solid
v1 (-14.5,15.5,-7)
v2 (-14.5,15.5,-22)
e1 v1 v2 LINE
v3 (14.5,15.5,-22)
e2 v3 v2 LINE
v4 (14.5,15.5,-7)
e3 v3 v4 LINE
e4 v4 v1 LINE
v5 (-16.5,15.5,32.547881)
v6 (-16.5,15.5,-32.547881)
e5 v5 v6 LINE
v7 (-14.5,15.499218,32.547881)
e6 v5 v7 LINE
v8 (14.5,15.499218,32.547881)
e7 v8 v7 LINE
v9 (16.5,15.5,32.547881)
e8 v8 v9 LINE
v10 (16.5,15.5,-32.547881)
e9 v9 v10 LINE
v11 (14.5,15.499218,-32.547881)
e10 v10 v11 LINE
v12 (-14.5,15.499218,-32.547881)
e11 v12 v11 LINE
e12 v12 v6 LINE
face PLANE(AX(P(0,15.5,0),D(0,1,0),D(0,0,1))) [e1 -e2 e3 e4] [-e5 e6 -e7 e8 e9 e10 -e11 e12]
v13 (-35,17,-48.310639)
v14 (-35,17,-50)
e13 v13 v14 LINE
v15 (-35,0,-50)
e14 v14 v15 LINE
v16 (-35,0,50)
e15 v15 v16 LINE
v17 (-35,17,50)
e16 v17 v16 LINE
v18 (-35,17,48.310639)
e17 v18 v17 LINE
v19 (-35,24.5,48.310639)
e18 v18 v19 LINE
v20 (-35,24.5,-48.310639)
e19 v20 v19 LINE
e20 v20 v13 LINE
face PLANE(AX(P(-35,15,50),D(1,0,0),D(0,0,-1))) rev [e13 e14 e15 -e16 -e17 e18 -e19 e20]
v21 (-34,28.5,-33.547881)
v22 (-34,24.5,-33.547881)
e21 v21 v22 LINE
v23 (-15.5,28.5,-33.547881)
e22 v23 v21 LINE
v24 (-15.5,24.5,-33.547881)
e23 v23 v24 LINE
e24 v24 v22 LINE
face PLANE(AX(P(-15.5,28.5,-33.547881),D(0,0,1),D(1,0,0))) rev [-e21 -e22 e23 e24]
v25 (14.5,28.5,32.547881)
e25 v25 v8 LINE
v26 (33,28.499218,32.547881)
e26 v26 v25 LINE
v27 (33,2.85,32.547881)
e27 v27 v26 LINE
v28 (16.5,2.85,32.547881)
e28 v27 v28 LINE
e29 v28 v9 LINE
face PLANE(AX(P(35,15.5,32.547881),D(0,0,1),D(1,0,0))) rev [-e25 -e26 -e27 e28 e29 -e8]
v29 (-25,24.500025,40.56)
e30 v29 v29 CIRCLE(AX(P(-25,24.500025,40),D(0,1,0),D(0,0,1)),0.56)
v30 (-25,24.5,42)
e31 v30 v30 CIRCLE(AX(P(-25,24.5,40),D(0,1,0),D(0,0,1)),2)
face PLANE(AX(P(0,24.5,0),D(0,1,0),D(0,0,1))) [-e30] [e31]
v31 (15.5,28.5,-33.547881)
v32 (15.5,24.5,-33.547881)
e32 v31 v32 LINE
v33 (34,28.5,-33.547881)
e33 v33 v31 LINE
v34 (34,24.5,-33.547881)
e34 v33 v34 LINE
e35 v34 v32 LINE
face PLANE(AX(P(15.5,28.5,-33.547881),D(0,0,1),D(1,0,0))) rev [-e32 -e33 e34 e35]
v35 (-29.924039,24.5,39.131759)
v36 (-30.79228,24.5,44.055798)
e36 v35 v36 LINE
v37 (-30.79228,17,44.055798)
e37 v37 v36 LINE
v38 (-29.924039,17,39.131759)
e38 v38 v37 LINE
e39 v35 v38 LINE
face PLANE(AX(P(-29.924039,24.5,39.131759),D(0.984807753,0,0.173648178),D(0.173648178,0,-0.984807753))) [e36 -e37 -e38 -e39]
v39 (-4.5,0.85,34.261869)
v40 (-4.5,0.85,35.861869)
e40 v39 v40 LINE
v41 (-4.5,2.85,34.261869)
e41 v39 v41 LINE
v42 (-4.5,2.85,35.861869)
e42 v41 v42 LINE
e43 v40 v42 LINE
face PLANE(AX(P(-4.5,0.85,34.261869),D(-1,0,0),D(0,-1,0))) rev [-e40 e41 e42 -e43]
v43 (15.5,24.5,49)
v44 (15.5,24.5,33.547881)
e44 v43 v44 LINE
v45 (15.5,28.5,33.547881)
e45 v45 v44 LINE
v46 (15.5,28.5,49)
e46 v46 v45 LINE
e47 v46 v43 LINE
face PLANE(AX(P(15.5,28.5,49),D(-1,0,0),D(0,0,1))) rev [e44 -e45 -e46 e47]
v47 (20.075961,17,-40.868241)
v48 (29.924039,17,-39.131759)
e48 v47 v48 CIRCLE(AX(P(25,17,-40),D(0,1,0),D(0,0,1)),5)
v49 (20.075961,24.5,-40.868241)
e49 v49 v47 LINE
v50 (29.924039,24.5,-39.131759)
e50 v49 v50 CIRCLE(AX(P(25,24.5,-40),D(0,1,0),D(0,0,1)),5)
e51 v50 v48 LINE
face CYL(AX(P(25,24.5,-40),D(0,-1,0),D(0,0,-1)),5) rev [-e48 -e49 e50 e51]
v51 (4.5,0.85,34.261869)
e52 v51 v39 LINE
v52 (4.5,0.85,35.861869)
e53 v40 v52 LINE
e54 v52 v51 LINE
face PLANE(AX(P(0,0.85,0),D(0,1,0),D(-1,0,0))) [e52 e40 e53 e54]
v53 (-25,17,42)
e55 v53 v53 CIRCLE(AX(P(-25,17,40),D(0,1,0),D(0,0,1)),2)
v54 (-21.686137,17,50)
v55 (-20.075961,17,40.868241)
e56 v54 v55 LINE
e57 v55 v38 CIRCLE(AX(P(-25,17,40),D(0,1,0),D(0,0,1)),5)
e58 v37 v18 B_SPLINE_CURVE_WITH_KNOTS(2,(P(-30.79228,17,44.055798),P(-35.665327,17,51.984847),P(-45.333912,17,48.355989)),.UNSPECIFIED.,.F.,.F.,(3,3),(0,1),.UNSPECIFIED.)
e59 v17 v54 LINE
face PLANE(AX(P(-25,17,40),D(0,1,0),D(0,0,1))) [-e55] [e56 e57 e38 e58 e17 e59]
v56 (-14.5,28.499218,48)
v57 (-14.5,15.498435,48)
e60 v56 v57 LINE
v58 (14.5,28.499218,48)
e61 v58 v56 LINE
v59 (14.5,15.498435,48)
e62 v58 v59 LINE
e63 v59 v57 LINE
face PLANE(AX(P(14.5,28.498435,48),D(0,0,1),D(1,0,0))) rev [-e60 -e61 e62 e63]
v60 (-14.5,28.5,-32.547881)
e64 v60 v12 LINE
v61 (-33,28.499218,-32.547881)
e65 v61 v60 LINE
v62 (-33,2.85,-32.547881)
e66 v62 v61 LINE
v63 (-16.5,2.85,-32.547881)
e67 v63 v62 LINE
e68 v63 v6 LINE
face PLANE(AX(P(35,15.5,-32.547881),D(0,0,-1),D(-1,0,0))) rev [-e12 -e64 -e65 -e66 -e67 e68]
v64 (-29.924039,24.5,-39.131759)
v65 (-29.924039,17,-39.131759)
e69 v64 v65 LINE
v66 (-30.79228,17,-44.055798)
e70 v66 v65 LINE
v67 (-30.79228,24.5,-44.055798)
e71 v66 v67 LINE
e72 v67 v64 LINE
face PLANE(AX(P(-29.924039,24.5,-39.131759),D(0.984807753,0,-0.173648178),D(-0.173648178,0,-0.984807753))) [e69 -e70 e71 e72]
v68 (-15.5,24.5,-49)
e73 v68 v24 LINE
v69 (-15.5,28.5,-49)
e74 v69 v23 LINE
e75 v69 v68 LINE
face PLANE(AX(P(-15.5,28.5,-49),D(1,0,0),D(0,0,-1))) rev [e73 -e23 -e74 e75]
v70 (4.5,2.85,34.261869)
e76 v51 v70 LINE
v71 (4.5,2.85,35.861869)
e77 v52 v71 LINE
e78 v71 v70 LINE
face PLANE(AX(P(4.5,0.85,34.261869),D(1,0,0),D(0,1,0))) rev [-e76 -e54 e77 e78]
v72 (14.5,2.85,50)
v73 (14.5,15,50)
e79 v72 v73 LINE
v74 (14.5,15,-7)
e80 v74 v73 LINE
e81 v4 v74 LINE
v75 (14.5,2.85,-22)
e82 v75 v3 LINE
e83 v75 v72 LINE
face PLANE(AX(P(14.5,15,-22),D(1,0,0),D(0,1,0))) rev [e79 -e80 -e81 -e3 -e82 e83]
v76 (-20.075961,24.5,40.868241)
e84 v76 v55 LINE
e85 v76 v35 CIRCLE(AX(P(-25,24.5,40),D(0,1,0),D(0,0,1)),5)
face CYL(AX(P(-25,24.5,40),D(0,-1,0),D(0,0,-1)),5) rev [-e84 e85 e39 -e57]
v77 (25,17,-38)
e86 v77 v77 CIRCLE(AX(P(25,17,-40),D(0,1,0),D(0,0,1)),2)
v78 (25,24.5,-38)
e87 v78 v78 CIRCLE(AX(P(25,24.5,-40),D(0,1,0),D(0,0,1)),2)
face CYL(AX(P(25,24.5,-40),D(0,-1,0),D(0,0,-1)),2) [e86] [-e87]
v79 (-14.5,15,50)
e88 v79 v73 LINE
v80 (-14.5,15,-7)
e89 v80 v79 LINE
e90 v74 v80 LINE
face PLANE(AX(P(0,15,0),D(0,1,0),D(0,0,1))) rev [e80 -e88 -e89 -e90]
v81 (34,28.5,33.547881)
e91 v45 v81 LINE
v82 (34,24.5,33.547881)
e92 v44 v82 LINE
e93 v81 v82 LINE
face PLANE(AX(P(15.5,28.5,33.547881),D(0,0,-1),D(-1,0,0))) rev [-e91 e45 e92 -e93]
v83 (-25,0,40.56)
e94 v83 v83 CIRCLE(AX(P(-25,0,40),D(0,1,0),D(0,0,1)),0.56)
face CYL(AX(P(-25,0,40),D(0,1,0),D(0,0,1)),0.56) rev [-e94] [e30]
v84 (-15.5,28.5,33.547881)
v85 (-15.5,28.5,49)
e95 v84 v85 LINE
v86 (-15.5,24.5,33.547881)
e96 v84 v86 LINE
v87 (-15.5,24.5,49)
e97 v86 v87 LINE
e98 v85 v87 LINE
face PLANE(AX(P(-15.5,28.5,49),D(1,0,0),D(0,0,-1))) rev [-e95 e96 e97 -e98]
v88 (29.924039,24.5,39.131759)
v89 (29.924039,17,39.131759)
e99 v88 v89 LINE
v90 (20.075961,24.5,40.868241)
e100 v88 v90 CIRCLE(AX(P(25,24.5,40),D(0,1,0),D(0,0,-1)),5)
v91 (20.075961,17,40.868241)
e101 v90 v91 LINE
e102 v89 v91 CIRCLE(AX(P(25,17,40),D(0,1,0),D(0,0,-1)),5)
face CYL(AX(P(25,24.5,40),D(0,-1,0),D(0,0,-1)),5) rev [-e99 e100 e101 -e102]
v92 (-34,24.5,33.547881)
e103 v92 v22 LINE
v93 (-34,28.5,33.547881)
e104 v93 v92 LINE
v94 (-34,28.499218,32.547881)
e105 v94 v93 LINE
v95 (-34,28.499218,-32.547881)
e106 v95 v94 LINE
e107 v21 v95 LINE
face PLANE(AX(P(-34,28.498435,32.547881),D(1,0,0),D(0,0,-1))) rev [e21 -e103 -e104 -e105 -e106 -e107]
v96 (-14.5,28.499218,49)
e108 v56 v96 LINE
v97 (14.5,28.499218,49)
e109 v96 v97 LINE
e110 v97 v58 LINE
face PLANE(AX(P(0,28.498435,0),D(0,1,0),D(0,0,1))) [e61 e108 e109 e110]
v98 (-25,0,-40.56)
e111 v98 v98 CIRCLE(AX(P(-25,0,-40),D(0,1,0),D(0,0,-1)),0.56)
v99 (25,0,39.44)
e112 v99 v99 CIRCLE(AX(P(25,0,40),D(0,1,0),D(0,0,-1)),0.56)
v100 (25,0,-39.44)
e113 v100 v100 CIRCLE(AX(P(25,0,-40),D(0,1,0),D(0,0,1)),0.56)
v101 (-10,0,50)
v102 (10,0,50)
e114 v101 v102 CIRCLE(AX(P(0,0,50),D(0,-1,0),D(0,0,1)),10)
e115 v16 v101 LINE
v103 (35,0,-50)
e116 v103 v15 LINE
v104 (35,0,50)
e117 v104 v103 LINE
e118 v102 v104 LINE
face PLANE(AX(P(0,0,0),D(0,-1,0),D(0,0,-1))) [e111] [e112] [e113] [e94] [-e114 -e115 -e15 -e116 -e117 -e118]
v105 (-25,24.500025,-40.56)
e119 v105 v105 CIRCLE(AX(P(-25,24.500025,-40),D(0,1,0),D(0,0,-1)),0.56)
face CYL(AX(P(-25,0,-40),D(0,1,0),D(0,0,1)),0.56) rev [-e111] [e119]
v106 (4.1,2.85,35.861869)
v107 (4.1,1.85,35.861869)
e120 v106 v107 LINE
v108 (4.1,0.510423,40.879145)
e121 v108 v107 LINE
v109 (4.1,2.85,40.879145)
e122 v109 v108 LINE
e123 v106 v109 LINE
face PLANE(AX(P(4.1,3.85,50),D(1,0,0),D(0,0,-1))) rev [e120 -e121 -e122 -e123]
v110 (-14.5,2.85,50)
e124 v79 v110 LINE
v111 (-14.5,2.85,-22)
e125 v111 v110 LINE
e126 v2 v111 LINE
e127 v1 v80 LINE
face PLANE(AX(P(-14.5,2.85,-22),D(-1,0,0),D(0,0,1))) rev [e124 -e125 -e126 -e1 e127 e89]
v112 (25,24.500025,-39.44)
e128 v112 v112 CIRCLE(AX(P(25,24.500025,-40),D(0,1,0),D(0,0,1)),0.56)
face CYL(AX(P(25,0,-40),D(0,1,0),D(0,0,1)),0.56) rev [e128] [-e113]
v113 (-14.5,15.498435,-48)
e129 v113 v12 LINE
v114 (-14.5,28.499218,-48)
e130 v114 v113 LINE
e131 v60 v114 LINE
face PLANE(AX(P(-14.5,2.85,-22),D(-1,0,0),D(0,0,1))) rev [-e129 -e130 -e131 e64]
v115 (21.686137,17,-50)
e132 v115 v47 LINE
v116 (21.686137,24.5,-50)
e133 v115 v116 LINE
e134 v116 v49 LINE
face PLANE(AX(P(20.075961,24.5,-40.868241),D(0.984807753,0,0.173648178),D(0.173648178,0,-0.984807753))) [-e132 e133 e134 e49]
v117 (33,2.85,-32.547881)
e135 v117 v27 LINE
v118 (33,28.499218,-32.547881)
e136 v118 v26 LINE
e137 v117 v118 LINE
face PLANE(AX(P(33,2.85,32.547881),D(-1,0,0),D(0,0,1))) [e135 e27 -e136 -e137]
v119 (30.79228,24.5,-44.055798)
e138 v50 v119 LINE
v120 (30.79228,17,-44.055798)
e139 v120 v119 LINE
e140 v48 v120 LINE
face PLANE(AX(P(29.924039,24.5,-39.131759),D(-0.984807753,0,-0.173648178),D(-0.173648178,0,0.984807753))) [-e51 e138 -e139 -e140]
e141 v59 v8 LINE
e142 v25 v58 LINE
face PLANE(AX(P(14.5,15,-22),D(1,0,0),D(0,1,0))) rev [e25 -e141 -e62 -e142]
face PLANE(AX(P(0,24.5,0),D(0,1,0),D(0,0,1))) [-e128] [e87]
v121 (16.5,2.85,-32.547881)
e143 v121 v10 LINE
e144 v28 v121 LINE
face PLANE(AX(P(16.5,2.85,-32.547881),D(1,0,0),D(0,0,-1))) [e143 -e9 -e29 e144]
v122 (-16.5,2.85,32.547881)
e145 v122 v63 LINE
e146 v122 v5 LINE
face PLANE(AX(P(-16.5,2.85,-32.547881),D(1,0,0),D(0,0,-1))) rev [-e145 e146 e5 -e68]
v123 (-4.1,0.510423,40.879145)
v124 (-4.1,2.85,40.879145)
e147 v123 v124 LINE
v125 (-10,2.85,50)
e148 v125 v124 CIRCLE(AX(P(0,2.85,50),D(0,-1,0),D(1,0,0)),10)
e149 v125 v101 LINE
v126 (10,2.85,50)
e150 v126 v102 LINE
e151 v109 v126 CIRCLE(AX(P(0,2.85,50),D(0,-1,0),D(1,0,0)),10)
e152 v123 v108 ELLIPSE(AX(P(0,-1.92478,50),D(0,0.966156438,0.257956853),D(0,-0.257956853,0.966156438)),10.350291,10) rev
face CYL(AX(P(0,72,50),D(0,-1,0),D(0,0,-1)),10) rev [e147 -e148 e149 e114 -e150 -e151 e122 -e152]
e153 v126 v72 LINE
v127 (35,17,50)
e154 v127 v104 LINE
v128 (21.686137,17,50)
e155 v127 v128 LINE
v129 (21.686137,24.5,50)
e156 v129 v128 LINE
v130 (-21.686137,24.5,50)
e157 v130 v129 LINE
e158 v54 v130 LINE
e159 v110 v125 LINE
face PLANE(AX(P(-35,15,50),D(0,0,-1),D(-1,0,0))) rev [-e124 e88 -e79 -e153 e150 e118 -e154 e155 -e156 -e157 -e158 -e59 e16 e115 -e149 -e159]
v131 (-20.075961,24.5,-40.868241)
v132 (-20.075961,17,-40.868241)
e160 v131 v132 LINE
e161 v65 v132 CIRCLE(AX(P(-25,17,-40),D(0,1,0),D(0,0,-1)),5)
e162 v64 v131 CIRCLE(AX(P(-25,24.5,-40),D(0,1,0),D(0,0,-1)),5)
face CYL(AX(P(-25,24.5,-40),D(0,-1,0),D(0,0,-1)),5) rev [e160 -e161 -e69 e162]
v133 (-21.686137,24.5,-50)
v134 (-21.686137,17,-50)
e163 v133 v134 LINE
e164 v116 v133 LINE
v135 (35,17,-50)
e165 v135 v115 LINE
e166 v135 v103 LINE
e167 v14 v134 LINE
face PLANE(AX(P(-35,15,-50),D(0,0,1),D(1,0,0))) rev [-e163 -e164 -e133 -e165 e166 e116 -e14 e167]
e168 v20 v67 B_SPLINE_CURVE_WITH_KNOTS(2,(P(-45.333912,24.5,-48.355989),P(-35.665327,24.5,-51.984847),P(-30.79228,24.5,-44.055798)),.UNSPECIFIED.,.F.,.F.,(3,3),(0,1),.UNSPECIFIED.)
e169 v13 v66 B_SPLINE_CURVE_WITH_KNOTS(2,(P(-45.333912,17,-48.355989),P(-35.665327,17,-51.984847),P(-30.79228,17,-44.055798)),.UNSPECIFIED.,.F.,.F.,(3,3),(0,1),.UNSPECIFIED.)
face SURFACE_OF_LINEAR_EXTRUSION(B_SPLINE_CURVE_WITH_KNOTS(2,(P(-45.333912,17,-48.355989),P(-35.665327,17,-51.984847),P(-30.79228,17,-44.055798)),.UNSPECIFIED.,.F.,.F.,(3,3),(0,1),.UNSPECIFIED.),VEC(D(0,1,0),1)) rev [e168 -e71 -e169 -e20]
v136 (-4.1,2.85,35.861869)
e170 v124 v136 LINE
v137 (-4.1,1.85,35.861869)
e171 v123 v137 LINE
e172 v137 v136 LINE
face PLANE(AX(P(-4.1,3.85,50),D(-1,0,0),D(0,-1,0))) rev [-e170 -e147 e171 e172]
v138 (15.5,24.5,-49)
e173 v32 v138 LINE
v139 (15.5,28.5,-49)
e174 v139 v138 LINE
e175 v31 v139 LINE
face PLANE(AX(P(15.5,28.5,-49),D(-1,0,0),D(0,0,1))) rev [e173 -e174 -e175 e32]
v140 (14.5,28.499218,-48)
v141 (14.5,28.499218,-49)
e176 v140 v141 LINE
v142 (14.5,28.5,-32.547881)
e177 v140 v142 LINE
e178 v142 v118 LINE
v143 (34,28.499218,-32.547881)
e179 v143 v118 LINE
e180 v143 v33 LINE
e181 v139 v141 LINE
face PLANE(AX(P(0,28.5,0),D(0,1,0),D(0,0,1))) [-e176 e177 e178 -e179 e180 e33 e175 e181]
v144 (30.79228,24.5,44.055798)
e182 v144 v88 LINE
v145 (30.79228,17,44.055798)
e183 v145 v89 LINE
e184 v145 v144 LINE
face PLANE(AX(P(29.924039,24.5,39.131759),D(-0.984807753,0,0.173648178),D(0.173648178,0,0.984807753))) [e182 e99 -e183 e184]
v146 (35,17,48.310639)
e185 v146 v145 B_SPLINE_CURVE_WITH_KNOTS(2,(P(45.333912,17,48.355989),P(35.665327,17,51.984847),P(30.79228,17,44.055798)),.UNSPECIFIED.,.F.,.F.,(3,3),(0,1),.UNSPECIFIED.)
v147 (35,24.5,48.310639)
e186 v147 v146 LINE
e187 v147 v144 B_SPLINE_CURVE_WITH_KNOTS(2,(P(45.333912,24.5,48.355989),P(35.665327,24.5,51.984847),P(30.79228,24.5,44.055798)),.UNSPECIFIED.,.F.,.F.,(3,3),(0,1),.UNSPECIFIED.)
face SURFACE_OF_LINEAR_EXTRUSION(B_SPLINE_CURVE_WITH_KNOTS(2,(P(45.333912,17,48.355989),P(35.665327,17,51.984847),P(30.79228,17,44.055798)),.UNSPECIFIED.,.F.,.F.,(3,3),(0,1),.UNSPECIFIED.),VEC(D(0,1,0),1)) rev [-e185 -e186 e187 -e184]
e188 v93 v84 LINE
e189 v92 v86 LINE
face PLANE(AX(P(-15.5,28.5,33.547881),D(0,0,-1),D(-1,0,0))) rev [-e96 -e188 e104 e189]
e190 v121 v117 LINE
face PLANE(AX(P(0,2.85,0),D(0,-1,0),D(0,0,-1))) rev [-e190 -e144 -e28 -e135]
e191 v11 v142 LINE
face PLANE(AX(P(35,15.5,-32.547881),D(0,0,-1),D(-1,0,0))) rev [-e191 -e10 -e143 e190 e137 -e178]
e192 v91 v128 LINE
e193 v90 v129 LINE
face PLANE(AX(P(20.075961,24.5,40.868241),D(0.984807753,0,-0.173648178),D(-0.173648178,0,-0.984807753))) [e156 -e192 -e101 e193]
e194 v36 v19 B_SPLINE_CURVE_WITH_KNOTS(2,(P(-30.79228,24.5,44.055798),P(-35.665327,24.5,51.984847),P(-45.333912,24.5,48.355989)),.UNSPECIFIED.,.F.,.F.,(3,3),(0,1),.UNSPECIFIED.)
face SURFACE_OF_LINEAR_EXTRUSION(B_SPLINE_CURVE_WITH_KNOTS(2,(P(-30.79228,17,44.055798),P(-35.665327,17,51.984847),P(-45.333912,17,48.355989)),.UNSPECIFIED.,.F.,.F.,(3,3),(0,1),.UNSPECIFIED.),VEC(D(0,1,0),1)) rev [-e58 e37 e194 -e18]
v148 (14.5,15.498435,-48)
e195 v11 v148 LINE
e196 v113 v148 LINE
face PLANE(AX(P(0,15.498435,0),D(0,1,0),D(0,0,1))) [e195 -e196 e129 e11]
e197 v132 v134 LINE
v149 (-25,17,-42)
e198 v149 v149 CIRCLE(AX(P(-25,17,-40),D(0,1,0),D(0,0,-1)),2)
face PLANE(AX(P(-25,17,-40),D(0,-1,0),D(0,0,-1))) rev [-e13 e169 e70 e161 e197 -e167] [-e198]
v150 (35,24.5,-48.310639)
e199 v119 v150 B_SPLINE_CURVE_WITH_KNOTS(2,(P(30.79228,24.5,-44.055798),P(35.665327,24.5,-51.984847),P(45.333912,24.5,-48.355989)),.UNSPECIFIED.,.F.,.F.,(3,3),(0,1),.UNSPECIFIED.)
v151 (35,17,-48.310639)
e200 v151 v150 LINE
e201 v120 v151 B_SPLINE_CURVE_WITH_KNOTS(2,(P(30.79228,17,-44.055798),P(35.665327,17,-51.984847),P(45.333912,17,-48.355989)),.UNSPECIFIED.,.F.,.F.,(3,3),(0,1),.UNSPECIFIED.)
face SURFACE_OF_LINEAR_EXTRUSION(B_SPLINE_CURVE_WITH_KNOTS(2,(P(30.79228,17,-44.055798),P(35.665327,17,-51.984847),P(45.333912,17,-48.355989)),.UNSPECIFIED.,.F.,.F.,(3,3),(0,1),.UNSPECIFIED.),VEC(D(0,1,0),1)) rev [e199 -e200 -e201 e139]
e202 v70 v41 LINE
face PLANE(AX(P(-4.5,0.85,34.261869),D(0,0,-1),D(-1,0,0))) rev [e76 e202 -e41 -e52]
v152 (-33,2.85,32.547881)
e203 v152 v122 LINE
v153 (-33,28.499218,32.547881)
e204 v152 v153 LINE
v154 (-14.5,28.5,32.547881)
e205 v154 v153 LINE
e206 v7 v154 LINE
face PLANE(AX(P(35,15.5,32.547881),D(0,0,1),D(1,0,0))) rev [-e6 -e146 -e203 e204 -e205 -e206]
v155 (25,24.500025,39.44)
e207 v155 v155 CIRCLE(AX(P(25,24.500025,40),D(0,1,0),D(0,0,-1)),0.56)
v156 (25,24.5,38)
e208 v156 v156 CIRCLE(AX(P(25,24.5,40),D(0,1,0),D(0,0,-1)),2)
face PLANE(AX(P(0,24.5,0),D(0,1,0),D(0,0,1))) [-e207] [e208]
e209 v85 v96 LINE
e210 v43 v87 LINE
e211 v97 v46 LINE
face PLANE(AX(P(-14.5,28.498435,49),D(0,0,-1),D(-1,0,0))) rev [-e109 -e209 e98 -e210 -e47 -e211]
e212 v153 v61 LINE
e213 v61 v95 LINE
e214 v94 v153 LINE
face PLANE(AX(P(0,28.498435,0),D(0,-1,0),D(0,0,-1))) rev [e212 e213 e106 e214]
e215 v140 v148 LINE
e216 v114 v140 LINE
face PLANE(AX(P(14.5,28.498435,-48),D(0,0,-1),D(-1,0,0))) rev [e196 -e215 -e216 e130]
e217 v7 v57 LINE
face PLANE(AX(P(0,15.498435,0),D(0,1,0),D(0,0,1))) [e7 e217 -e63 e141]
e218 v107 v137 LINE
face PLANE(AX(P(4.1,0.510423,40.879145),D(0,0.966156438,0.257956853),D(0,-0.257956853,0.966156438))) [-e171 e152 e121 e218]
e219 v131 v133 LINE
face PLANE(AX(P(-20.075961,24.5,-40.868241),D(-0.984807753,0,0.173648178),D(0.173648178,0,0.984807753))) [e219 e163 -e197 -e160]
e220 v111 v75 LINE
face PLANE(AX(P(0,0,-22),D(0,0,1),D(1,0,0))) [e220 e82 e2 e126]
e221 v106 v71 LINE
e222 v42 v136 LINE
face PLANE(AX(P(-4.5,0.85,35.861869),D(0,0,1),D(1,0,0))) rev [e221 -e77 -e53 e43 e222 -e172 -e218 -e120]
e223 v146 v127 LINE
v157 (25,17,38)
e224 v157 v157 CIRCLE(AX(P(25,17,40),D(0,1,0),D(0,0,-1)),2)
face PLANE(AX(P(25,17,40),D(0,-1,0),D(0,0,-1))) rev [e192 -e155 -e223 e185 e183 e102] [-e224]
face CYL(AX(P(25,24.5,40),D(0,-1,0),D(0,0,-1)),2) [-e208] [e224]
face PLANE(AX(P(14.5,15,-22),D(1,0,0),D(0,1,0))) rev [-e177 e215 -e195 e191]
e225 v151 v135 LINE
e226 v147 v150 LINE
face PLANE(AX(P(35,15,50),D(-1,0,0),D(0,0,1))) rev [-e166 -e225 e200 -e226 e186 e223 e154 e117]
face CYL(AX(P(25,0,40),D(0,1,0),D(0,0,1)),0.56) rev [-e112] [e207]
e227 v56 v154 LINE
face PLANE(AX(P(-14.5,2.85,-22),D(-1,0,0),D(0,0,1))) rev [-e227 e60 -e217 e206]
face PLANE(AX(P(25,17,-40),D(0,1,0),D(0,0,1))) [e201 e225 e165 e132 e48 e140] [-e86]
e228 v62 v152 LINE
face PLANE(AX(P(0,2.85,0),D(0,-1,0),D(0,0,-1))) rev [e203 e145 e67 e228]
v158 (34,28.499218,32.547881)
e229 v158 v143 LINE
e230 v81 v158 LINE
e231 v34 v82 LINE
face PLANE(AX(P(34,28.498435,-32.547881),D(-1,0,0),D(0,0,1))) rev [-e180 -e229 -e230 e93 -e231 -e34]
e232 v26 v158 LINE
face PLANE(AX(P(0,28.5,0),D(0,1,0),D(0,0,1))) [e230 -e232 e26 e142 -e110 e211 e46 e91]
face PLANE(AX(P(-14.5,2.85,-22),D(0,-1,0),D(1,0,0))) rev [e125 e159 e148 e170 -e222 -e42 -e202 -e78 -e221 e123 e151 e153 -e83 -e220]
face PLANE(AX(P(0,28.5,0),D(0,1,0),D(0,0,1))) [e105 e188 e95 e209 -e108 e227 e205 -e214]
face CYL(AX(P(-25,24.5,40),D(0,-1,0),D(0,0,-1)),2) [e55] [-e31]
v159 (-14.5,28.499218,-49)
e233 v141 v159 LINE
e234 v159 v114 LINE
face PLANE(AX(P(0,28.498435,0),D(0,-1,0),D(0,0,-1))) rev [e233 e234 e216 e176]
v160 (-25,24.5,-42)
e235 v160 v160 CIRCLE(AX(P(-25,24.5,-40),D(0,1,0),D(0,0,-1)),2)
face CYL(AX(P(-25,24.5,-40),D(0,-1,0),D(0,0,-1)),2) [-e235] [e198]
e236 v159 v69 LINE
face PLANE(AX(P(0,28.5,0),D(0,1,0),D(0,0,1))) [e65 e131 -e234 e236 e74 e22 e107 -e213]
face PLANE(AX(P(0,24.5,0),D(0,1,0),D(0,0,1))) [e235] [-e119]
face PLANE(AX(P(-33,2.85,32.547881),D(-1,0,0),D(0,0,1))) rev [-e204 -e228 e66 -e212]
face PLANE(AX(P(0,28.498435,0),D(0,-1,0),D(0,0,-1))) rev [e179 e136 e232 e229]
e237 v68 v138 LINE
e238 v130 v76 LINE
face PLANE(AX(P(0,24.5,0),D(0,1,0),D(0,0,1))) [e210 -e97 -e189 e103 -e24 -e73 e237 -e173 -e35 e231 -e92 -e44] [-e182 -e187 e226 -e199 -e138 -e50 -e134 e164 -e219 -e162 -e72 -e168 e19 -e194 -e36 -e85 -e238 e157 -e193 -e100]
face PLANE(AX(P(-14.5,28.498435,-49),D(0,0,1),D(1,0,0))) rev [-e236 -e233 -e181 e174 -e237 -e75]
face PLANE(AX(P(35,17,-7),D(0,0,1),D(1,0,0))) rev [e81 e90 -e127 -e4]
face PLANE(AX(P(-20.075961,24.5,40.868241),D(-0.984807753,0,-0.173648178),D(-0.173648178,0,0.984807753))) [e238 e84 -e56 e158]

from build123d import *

# Parameters (mm, degrees)
CROQUIS1_W                    = 70
CROQUIS1_H                    = 100
SALIENTE_EXTRUIR1_DEPTH       = 15
CROQUIS2_W                    = 29
CROQUIS2_H                    = 12.15
CORTAR_EXTRUIR1_DEPTH         = 72
CORTAR_EXTRUIR2_DEPTH         = 72
CROQUIS4_W                    = 9
CROQUIS4_H                    = 1.6
CORTAR_EXTRUIR3_DEPTH         = 2
CROQUIS6_W                    = 8.2
CROQUIS6_H                    = 2
CORTAR_EXTRUIR4_DEPTH         = 94.926889384
CORTAR_EXTRUIR5_DEPTH         = 8.2
CROQUIS8_W                    = 70
CROQUIS8_H                    = 57
SALIENTE_EXTRUIR3_DEPTH       = 2
CROQUIS9_W                    = 20.5
CROQUIS9_H                    = 15
SALIENTE_EXTRUIR4_DEPTH       = 2
CROQUIS10_W                   = 70
CROQUIS10_H                   = 22.450330877
SALIENTE_EXTRUIR5_DEPTH       = 2
CROQUIS12_W                   = 70
CROQUIS12_H                   = 100
CROQUIS12_W_2                 = 29
CROQUIS12_H_2                 = 15
SALIENTE_EXTRUIR6_DEPTH       = 7.5
CROQUIS11_R                   = 2
CORTAR_EXTRUIR6_DEPTH         = 7.5
CORTAR_EXTRUIR7_DEPTH         = 7.5
CROQUIS15_W                   = 29
CROQUIS15_H                   = 8.521564644
CORTAR_EXTRUIR8_DEPTH         = 109.743965496
CROQUIS16_W                   = 70
CROQUIS16_H                   = 65.095762462
CORTAR_EXTRUIR9_DEPTH         = 9
CROQUIS17_W                   = 29
CROQUIS17_H                   = 17.452118769
CORTAR_EXTRUIR10_DEPTH        = 0.48
CROQUIS19_W                   = 16.5
CROQUIS19_H                   = 65.095762462
CORTAR_EXTRUIR12_DEPTH        = 12.65
CORTAR_EXTRUIR13_DEPTH        = 66.766633044
CORTAR_EXTRUIR13_DEPTH_BACK   = 66.766633044
CROQUIS23_R                   = 0.56
CROQUIS24_W                   = 29
CROQUIS24_H                   = 1
CROQUIS24_W_2                 = 1
CROQUIS24_H_2                 = 65.095762462
SALIENTE_EXTRUIR8_DEPTH       = 13
SALIENTE_EXTRUIR9_START       = -0.001564644
SALIENTE_EXTRUIR9_OUTLINE_W   = 29
SALIENTE_EXTRUIR9_OUTLINE_H   = 1
SALIENTE_EXTRUIR9_OUTLINE_W_2 = 1
SALIENTE_EXTRUIR9_OUTLINE_H_2 = 65.095762462
SALIENTE_EXTRUIR9_DEPTH       = 9.001564644
SALIENTE_EXTRUIR10_DEPTH      = 4


# Read off the part's stored shape, not the designer's step: Saliente-Extruir9
with BuildPart() as part:
    # Croquis1 → Saliente-Extruir1 (new body)
    with BuildSketch(Plane(origin=(0, 0, 0), x_dir=(1, 0, 0), z_dir=(0, 1, 0))):
        Rectangle(CROQUIS1_W, CROQUIS1_H)
    extrude(amount=SALIENTE_EXTRUIR1_DEPTH)

    # Croquis2 → Cortar-Extruir1 (cut)
    with BuildSketch(Plane.XY.offset(50)):
        with Locations((0, 8.925)):
            Rectangle(CROQUIS2_W, CROQUIS2_H)
    extrude(amount=-CORTAR_EXTRUIR1_DEPTH, mode=Mode.SUBTRACT)

    # Croquis3 → Cortar-Extruir2 (cut)
    with BuildSketch(Plane.XZ):
        with BuildLine():
            Line((-10, 50), (10, 50))
            ThreePointArc((10, 50), (0, 40), (-10, 50))
        make_face()
    extrude(amount=-CORTAR_EXTRUIR2_DEPTH, mode=Mode.SUBTRACT)

    # Croquis4 → Cortar-Extruir3 (cut)
    with BuildSketch(Plane(origin=(0, 2.85, 0), x_dir=(1, 0, 0), z_dir=(0, 1, 0))):
        with Locations((0, -35.061869007)):
            Rectangle(CROQUIS4_W, CROQUIS4_H)
    extrude(amount=-CORTAR_EXTRUIR3_DEPTH, mode=Mode.SUBTRACT)

    # Croquis6 → Cortar-Extruir4 (cut, through all)
    with BuildSketch(Plane(origin=(0, 0, 35.861869007), x_dir=(-1, 0, 0), z_dir=(0, 0, -1))):
        with Locations((0, 2.85)):
            Rectangle(CROQUIS6_W, CROQUIS6_H)
    extrude(amount=-CORTAR_EXTRUIR4_DEPTH, mode=Mode.SUBTRACT)

    # Croquis7 → Cortar-Extruir5 (cut)
    with BuildSketch(Plane(origin=(-4.1, 0, 0), x_dir=(0, 0, -1), z_dir=(1, 0, 0))):
        Polygon((-40.879144777, 0.510423286), (-35.861869007, 1.85), (-40.879144777, 1.85), align=None)
    extrude(amount=CORTAR_EXTRUIR5_DEPTH, mode=Mode.SUBTRACT)

    # Croquis8 → Saliente-Extruir3 (add)
    with BuildSketch(Plane(origin=(0, 15, 0), x_dir=(1, 0, 0), z_dir=(0, 1, 0))):
        with Locations((0, -21.5)):
            Rectangle(CROQUIS8_W, CROQUIS8_H)
        Polygon((14.5, 22), (35, 22), (35, 27.549669123), (-35, 27.549669123), (-35, 22), align=None)
    extrude(amount=SALIENTE_EXTRUIR3_DEPTH)

    # Croquis9 → Saliente-Extruir4 (add)
    with BuildSketch(Plane(origin=(0, 15, 0), x_dir=(1, 0, 0), z_dir=(0, 1, 0))):
        with Locations((-24.75, 14.5)):
            Rectangle(CROQUIS9_W, CROQUIS9_H)
        with Locations((24.75, 14.5)):
            Rectangle(CROQUIS9_W, CROQUIS9_H)
    extrude(amount=SALIENTE_EXTRUIR4_DEPTH)

    # Croquis10 → Saliente-Extruir5 (add)
    with BuildSketch(Plane(origin=(0, 15, 0), x_dir=(1, 0, 0), z_dir=(0, 1, 0))):
        with Locations((0, 38.774834562)):
            Rectangle(CROQUIS10_W, CROQUIS10_H)
    extrude(amount=SALIENTE_EXTRUIR5_DEPTH)

    # Croquis12 → Saliente-Extruir6 (add)
    with BuildSketch(Plane(origin=(0, 17, 0), x_dir=(1, 0, 0), z_dir=(0, 1, 0))):
        Rectangle(CROQUIS12_W, CROQUIS12_H)
        with Locations((0, 14.5)):
            Rectangle(CROQUIS12_W_2, CROQUIS12_H_2, mode=Mode.SUBTRACT)
    extrude(amount=SALIENTE_EXTRUIR6_DEPTH)

    # Croquis11 → Cortar-Extruir6 (cut)
    # profile 1 of 4: a face of its own
    with BuildSketch(Plane(origin=(0, 17, 0), x_dir=(1, 0, 0), z_dir=(0, 1, 0))):
        with BuildLine():
            Line((20.075961235, 40.868240888), (21.812443012, 50.716318418))
            ThreePointArc((21.812443012, 50.716318418), (27.604722665, 54.772116295), (31.660520542, 48.979836642))
            Line((31.660520542, 48.979836642), (29.924038765, 39.131759112))
            ThreePointArc((29.924038765, 39.131759112), (24.131759112, 35.075961235), (20.075961235, 40.868240888))
        make_face()
        with Locations(Location((25, 40, 0), (0, 0, 270))):
            Circle(CROQUIS11_R, mode=Mode.SUBTRACT)
    # profile 2 of 4: a face of its own
    with BuildSketch(Plane(origin=(0, 17, 0), x_dir=(1, 0, 0), z_dir=(0, 1, 0))):
        with BuildLine():
            Line((-20.075961235, 40.868240888), (-21.812443012, 50.716318418))
            ThreePointArc((-21.812443012, 50.716318418), (-27.604722665, 54.772116295), (-31.660520542, 48.979836642))
            Line((-31.660520542, 48.979836642), (-29.924038765, 39.131759112))
            ThreePointArc((-29.924038765, 39.131759112), (-24.131759112, 35.075961235), (-20.075961235, 40.868240888))
        make_face()
        with Locations(Location((-25, 40, 0), (0, 0, 90))):
            Circle(CROQUIS11_R, mode=Mode.SUBTRACT)
    # profile 3 of 4: a face of its own
    with BuildSketch(Plane(origin=(0, 17, 0), x_dir=(1, 0, 0), z_dir=(0, 1, 0))):
        with BuildLine():
            Line((20.075961235, -40.868240888), (21.812443012, -50.716318418))
            ThreePointArc((21.812443012, -50.716318418), (27.604722665, -54.772116295), (31.660520542, -48.979836642))
            Line((31.660520542, -48.979836642), (29.924038765, -39.131759112))
            ThreePointArc((29.924038765, -39.131759112), (24.131759112, -35.075961235), (20.075961235, -40.868240888))
        make_face()
        with Locations(Location((25, -40, 0), (0, 0, 90))):
            Circle(CROQUIS11_R, mode=Mode.SUBTRACT)
    # profile 4 of 4: a face of its own
    with BuildSketch(Plane(origin=(0, 17, 0), x_dir=(1, 0, 0), z_dir=(0, 1, 0))):
        with BuildLine():
            Line((-20.075961235, -40.868240888), (-21.812443012, -50.716318418))
            ThreePointArc((-21.812443012, -50.716318418), (-27.604722665, -54.772116295), (-31.660520542, -48.979836642))
            Line((-31.660520542, -48.979836642), (-29.924038765, -39.131759112))
            ThreePointArc((-29.924038765, -39.131759112), (-24.131759112, -35.075961235), (-20.075961235, -40.868240888))
        make_face()
        with Locations(Location((-25, -40, 0), (0, 0, 270))):
            Circle(CROQUIS11_R, mode=Mode.SUBTRACT)
    extrude(amount=CORTAR_EXTRUIR6_DEPTH, mode=Mode.SUBTRACT)

    # Croquis13 → Cortar-Extruir7 (cut)
    with BuildSketch(Plane(origin=(0, 24.5, 0), x_dir=(1, 0, 0), z_dir=(0, 1, 0))):
        with BuildLine():
            Line((30.792279653, 44.055797877), (30.792279653, 51.405221368))
            Line((30.792279653, 51.405221368), (45.333912294, 51.405221368))
            Line((45.333912294, 51.405221368), (45.333912294, 48.355988615))
            add(Edge.make_bspline(
                [(30.792279653, 44.055797877), (35.665326883, 51.984846729), (45.333912294, 48.355988615)],
                knots=[0, 0, 0, 1, 1, 1], degree=2))
        make_face()
        with BuildLine():
            Line((-30.792279653, 51.405221368), (-45.333912294, 51.405221368))
            Line((-45.333912294, 51.405221368), (-45.333912294, 48.355988615))
            add(Edge.make_bspline(
                [(-30.792279653, 44.055797877), (-35.665326883, 51.984846729), (-45.333912294, 48.355988615)],
                knots=[0, 0, 0, 1, 1, 1], degree=2))
            Line((-30.792279653, 44.055797877), (-30.792279653, 51.405221368))
        make_face()
        with BuildLine():
            Line((30.792279653, -51.405221368), (45.333912294, -51.405221368))
            Line((45.333912294, -51.405221368), (45.333912294, -48.355988615))
            add(Edge.make_bspline(
                [(30.792279653, -44.055797877), (35.665326883, -51.984846729), (45.333912294, -48.355988615)],
                knots=[0, 0, 0, 1, 1, 1], degree=2))
            Line((30.792279653, -44.055797877), (30.792279653, -51.405221368))
        make_face()
        with BuildLine():
            Line((-30.792279653, -44.055797877), (-30.792279653, -51.405221368))
            Line((-30.792279653, -51.405221368), (-45.333912294, -51.405221368))
            Line((-45.333912294, -51.405221368), (-45.333912294, -48.355988615))
            add(Edge.make_bspline(
                [(-30.792279653, -44.055797877), (-35.665326883, -51.984846729), (-45.333912294, -48.355988615)],
                knots=[0, 0, 0, 1, 1, 1], degree=2))
        make_face()
    extrude(amount=-CORTAR_EXTRUIR7_DEPTH, mode=Mode.SUBTRACT)

    # Croquis15 → Cortar-Extruir8 (cut, through all)
    with BuildSketch(Plane(origin=(0, 0, -50), x_dir=(-1, 0, 0), z_dir=(0, 0, -1))):
        with Locations((0, 20.239217678)):
            Rectangle(CROQUIS15_W, CROQUIS15_H)
    extrude(amount=-CORTAR_EXTRUIR8_DEPTH, mode=Mode.SUBTRACT)

    # Croquis16 → Cortar-Extruir9 (cut)
    with BuildSketch(Plane(origin=(0, 24.5, 0), x_dir=(1, 0, 0), z_dir=(0, 1, 0))):
        Rectangle(CROQUIS16_W, CROQUIS16_H)
    extrude(amount=-CORTAR_EXTRUIR9_DEPTH, mode=Mode.SUBTRACT)

    # Croquis17 → Cortar-Extruir10 (cut)
    with BuildSketch(Plane(origin=(0, 15.978435356, 0), x_dir=(1, 0, 0), z_dir=(0, 1, 0))):
        with Locations((0, 41.273940616)):
            Rectangle(CROQUIS17_W, CROQUIS17_H)
        with Locations((0, -41.273940616)):
            Rectangle(CROQUIS17_W, CROQUIS17_H)
    extrude(amount=-CORTAR_EXTRUIR10_DEPTH, mode=Mode.SUBTRACT)

    # Croquis19 → Cortar-Extruir12 (cut)
    with BuildSketch(Plane(origin=(0, 15.5, 0), x_dir=(1, 0, 0), z_dir=(0, 1, 0))):
        with Locations((-24.75, 0)):
            Rectangle(CROQUIS19_W, CROQUIS19_H)
    cortar_extruir12 = extrude(amount=-CORTAR_EXTRUIR12_DEPTH, mode=Mode.SUBTRACT)

    # Simetría1: Cortar-Extruir12 across plane
    add(cortar_extruir12.mirror(Plane(origin=(0, 0, 0), x_dir=(0, 0, 1), z_dir=(1, 0, 0))), mode=Mode.SUBTRACT)

    # Croquis23 → Cortar-Extruir13 (cut, two sides: drawn at the far end of the back side and taken through both)
    with BuildSketch(Plane(origin=(0, 24.5, 0), x_dir=(1, 0, 0), z_dir=(0, 1, 0)).offset(-CORTAR_EXTRUIR13_DEPTH_BACK)):
        with Locations(Location((-25, -40, 0), (0, 0, 270))):
            Circle(CROQUIS23_R)
        with Locations(Location((-25, 40, 0), (0, 0, 90))):
            Circle(CROQUIS23_R)
        with Locations(Location((25, 40, 0), (0, 0, 270))):
            Circle(CROQUIS23_R)
        with Locations(Location((25, -40, 0), (0, 0, 90))):
            Circle(CROQUIS23_R)
    extrude(amount=CORTAR_EXTRUIR13_DEPTH + CORTAR_EXTRUIR13_DEPTH_BACK, mode=Mode.SUBTRACT)

    # Croquis24 → Saliente-Extruir8 (add)
    with BuildSketch(Plane(origin=(0, 15.498435356, 0), x_dir=(1, 0, 0), z_dir=(0, 1, 0))):
        with Locations((0, -48.5)):
            Rectangle(CROQUIS24_W, CROQUIS24_H)
        with Locations((33.5, 0)):
            Rectangle(CROQUIS24_W_2, CROQUIS24_H_2)
        with Locations((-33.5, 0)):
            Rectangle(CROQUIS24_W_2, CROQUIS24_H_2)
        with Locations((0, 48.5)):
            Rectangle(CROQUIS24_W, CROQUIS24_H)
    extrude(amount=SALIENTE_EXTRUIR8_DEPTH)

    # Saliente-Extruir9 outline → Saliente-Extruir9 (add)
    with BuildSketch(Plane(origin=(0, 15.5, 0), x_dir=(1, 0, 0), z_dir=(0, 1, 0)).offset(SALIENTE_EXTRUIR9_START)):
        with Locations((0, 49.5)):
            Rectangle(SALIENTE_EXTRUIR9_OUTLINE_W, SALIENTE_EXTRUIR9_OUTLINE_H)
        with Locations((-34.5, 0)):
            Rectangle(SALIENTE_EXTRUIR9_OUTLINE_W_2, SALIENTE_EXTRUIR9_OUTLINE_H_2)
        with Locations((34.5, 0)):
            Rectangle(SALIENTE_EXTRUIR9_OUTLINE_W_2, SALIENTE_EXTRUIR9_OUTLINE_H_2)
        with Locations((0, -49.5)):
            Rectangle(SALIENTE_EXTRUIR9_OUTLINE_W, SALIENTE_EXTRUIR9_OUTLINE_H)
    extrude(amount=SALIENTE_EXTRUIR9_DEPTH)

    # Croquis26 → Saliente-Extruir10 (add)
    with BuildSketch(Plane(origin=(0, 24.5, 0), x_dir=(1, 0, 0), z_dir=(0, 1, 0))):
        Polygon((-14.5, -49), (-15.5, -49), (-15.5, -33.547881231), (-34, -33.547881231), (-34, -32.547881231), (-14.5, -32.547881231), align=None)
        Polygon((14.5, -49), (14.5, -32.547881231), (34, -32.547881231), (34, -33.547881231), (15.5, -33.547881231), (15.5, -49), align=None)
        Polygon((14.5, 49), (15.5, 49), (15.5, 33.547881231), (34, 33.547881231), (34, 32.547881231), (14.5, 32.547881231), align=None)
        Polygon((-14.5, 49), (-14.5, 32.547881231), (-34, 32.547881231), (-34, 33.547881231), (-15.5, 33.547881231), (-15.5, 49), align=None)
    extrude(amount=SALIENTE_EXTRUIR10_DEPTH)


solid = part.part
